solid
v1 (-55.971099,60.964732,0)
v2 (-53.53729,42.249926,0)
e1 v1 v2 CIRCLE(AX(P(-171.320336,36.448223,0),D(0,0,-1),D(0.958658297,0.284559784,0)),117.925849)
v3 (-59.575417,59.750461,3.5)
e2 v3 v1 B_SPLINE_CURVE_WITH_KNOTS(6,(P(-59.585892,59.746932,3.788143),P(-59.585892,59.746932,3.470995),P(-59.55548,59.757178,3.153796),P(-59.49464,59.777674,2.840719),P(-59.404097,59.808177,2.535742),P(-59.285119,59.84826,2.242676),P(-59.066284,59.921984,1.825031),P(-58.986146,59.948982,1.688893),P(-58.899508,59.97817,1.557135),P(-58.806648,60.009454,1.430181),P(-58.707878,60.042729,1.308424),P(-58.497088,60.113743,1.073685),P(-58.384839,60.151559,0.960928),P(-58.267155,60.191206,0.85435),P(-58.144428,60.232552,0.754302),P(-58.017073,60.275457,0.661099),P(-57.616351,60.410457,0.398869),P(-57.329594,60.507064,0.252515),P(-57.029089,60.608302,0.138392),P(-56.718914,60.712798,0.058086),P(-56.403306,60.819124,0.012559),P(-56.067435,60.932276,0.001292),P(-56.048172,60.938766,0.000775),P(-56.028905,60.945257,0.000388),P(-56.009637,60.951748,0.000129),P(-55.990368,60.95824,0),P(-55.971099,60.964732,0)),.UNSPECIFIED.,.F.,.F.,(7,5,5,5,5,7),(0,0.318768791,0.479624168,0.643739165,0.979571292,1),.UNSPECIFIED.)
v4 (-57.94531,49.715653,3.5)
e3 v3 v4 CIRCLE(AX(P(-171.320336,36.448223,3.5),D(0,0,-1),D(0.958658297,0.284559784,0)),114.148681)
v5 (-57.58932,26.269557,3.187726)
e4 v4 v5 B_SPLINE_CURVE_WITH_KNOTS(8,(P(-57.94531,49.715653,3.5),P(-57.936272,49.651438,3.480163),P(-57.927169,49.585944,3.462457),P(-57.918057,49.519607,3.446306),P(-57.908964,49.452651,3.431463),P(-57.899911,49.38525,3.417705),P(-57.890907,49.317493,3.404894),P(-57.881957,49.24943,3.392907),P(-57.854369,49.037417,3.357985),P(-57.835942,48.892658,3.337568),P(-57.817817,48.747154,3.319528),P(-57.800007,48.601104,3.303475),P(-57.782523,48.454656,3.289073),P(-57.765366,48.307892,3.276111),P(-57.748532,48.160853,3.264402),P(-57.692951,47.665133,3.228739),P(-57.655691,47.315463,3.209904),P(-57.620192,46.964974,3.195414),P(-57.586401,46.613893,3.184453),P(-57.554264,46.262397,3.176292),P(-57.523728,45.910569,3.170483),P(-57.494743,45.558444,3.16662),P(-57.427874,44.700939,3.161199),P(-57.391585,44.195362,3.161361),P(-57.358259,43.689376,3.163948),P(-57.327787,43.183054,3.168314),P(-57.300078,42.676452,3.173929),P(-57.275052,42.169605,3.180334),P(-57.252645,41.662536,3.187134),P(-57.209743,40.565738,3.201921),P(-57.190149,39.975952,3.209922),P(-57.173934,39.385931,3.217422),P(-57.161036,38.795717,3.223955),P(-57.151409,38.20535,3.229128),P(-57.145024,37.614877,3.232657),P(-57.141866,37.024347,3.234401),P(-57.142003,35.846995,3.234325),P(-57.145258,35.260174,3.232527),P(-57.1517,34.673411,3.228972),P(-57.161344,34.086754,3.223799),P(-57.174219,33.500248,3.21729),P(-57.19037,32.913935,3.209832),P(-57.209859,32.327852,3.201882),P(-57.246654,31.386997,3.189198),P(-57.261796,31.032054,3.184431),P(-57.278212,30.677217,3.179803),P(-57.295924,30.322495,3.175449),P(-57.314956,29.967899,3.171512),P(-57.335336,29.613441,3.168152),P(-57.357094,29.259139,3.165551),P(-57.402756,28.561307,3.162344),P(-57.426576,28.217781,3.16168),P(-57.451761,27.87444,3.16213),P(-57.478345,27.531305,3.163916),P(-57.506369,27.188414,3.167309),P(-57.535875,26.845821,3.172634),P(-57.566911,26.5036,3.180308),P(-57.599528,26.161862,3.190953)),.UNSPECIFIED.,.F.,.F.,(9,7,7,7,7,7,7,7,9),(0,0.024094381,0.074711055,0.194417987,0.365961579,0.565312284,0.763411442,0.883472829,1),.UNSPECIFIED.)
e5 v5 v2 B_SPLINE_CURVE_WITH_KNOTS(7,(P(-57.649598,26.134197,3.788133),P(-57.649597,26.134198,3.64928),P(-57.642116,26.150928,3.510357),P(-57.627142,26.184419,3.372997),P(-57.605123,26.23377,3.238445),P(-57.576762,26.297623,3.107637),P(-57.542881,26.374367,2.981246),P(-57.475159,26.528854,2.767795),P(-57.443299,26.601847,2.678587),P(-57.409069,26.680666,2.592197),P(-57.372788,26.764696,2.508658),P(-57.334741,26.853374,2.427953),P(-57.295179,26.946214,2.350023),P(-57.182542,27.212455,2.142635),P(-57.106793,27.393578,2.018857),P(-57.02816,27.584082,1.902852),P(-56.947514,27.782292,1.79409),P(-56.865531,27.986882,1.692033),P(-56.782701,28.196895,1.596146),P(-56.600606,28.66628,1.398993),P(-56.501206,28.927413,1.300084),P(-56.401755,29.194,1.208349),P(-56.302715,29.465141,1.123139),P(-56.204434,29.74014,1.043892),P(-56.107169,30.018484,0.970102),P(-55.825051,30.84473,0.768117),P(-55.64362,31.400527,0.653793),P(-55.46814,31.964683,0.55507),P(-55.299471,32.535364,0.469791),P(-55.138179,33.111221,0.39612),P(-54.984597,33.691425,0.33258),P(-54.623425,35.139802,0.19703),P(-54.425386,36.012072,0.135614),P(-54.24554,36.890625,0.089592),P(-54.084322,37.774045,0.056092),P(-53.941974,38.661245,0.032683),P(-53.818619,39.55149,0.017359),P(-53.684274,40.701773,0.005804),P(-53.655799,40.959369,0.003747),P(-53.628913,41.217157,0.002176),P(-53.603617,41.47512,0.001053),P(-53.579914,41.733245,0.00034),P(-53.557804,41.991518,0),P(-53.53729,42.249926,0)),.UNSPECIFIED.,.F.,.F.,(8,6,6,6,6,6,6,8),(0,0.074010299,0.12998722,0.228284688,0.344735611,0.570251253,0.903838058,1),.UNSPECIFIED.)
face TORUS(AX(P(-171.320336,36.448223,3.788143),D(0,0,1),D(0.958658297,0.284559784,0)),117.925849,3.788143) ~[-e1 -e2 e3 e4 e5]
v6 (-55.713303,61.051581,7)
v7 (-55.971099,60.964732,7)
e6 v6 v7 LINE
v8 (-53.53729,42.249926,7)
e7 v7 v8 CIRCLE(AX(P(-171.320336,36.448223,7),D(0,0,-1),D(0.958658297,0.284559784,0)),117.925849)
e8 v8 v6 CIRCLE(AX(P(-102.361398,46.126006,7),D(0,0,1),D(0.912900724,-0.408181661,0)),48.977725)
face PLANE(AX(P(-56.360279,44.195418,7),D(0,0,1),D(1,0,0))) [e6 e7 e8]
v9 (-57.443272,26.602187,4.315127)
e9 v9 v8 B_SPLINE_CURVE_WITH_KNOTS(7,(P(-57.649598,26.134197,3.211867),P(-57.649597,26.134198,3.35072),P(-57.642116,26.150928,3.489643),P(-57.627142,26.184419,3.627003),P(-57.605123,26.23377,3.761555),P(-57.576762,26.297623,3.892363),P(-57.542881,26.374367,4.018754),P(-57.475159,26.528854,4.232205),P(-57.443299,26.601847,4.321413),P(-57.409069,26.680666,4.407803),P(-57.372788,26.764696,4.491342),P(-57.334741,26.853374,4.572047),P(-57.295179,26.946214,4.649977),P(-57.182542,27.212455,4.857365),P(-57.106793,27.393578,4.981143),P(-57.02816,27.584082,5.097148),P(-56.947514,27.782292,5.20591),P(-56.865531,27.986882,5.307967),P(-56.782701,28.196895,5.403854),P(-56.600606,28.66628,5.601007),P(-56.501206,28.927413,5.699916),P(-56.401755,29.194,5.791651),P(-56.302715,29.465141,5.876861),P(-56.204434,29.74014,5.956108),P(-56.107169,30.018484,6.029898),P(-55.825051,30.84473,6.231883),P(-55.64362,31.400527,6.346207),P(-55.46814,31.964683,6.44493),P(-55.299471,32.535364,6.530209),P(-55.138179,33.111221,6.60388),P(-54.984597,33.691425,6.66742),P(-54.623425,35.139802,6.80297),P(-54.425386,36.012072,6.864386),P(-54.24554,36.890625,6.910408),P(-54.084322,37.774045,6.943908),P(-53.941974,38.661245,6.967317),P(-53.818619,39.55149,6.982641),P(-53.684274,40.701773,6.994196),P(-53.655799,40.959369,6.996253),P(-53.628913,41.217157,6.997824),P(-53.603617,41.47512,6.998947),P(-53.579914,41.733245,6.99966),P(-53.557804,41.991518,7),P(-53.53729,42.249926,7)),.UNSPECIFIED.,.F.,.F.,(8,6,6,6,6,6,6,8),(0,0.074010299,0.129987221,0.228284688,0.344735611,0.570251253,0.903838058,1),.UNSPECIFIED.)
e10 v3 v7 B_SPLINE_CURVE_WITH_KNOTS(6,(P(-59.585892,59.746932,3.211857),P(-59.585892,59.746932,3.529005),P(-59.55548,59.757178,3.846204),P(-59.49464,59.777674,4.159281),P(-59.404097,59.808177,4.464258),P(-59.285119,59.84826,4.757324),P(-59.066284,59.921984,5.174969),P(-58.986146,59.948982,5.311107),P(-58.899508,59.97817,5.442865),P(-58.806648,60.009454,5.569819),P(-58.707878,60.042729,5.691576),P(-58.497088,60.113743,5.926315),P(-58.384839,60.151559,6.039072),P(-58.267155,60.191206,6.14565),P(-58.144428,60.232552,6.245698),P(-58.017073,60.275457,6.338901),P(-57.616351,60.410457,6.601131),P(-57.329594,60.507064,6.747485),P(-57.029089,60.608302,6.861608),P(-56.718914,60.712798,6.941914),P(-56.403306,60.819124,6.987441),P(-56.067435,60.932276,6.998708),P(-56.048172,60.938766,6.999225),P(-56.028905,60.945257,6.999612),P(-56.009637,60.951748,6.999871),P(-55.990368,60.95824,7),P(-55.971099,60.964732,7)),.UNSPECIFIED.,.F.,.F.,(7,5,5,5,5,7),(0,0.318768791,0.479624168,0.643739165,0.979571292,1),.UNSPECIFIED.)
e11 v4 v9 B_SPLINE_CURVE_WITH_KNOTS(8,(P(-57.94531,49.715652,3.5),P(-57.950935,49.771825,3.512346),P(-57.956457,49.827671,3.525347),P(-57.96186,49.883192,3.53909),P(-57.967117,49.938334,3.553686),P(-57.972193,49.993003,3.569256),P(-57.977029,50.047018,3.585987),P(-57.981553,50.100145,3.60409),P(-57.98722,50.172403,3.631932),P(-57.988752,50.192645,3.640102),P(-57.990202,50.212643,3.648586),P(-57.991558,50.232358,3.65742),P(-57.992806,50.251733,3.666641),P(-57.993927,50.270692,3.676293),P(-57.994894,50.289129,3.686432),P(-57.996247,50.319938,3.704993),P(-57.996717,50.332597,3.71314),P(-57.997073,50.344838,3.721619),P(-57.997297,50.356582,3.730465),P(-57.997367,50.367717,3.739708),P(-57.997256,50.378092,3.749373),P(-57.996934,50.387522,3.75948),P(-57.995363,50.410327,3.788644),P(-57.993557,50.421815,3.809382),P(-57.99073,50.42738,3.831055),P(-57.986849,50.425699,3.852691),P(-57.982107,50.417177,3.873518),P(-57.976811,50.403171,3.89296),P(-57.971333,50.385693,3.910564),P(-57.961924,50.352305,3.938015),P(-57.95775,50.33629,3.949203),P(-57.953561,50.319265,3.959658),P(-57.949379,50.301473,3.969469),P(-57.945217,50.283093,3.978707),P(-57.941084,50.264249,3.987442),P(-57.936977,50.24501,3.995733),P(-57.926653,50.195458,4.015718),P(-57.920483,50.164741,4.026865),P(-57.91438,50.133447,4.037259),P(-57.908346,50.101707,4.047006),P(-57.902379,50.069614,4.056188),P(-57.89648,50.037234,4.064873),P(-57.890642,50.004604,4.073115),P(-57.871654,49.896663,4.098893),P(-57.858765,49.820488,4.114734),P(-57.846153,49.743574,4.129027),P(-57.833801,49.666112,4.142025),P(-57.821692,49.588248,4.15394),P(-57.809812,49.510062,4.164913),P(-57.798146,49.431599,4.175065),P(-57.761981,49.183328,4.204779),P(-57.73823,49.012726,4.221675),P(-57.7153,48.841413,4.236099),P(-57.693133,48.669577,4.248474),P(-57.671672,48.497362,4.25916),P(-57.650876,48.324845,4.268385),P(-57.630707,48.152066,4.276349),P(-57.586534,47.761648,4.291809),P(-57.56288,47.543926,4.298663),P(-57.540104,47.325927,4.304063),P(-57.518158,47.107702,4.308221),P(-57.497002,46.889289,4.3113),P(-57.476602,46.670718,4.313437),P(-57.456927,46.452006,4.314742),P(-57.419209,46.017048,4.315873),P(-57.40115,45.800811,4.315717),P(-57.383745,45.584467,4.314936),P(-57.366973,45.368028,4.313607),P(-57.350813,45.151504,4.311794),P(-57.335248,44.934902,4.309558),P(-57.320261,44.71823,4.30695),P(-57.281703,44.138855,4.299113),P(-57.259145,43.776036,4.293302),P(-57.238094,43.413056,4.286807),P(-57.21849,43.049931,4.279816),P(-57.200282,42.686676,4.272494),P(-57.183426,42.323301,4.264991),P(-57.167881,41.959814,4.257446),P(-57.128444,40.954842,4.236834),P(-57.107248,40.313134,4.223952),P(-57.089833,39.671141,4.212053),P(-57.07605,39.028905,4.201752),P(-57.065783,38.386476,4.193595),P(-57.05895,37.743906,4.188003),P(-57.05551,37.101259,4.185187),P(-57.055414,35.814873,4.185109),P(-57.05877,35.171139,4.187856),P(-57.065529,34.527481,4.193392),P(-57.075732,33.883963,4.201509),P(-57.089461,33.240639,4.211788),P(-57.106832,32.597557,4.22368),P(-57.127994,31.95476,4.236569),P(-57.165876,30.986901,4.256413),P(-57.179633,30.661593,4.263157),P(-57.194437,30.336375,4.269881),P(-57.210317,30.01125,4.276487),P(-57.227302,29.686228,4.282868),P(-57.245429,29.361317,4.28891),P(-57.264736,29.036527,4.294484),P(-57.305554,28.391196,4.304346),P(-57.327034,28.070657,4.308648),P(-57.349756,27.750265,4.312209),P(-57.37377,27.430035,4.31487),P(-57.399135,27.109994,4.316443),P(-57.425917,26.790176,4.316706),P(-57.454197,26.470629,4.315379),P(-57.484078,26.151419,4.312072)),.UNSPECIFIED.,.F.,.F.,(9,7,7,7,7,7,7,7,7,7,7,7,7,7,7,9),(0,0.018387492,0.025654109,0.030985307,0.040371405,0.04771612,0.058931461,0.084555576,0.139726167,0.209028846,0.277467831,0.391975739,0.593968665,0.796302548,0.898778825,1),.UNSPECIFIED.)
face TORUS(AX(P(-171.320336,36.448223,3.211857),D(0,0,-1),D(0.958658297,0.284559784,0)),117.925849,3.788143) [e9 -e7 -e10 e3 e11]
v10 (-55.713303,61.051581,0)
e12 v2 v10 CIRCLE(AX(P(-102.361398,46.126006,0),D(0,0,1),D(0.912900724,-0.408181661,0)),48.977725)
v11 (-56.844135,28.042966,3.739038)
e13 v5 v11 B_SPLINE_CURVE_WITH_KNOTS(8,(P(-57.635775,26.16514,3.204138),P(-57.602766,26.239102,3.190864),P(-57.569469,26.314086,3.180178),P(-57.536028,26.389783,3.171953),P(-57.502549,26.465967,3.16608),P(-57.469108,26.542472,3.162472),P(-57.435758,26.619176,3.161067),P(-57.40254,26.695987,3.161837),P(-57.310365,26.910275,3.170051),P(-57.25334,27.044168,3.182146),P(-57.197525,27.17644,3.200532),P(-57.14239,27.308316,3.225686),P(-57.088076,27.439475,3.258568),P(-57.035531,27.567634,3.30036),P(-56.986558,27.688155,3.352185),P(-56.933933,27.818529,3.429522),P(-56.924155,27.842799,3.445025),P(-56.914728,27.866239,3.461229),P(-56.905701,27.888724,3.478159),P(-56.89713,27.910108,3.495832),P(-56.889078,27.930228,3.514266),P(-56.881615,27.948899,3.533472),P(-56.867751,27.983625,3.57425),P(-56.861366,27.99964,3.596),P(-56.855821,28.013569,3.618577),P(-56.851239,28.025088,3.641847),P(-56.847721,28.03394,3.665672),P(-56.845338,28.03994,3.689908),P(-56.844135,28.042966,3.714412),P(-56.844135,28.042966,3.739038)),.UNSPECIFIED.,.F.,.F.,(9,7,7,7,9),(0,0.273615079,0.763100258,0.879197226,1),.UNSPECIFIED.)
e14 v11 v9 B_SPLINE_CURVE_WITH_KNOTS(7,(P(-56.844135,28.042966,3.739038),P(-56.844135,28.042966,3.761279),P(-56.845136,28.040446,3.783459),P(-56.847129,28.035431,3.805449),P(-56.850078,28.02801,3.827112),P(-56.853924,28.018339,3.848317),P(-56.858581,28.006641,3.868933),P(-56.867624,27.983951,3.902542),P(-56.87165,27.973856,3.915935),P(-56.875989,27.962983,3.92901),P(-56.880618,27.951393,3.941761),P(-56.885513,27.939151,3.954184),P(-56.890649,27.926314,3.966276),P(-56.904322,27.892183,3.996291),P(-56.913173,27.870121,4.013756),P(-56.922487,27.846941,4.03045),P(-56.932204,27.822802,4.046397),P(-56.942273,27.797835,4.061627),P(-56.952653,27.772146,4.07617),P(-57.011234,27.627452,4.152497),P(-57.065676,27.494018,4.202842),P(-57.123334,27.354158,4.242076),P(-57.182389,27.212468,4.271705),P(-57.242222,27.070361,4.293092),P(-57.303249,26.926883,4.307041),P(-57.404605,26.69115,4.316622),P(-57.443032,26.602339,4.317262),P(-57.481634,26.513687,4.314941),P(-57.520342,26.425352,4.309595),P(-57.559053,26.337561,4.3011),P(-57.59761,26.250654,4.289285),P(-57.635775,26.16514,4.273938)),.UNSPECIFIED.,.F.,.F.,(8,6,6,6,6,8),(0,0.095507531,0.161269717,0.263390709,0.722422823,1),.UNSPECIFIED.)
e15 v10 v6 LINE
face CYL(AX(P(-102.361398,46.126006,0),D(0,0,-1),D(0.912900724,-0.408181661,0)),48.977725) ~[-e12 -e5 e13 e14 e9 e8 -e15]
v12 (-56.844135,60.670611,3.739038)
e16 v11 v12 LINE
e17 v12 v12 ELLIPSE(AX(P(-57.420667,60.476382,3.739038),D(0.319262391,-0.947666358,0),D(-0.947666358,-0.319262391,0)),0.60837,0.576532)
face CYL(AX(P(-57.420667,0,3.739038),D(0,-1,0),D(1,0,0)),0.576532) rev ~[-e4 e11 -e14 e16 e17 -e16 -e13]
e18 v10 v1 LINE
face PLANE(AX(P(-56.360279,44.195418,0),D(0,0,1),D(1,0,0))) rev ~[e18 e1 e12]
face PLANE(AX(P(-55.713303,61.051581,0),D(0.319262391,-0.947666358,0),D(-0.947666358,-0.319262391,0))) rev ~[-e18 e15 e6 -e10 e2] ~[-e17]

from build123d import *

# Parameters (mm, degrees)
F1_DEPTH    = 7
F2_T2_ANGLE = 26.471202853
F2_T4_ANGLE = 26.471202853
F3_R        = 0.5765318272
F4_DEPTH    = 81.70182


# Not quite as in the source:
# - a fillet or chamfer that OpenCascade refuses, or shapes differently, is made with other operations: its cross-section is extruded or revolved along the edge and cut away or added


with BuildPart() as f1:
    # F0 (on Top) → F1 (new body)
    with BuildSketch(Plane.XY):
        with BuildLine():
            Line((-55.7133033872, 61.0515810549), (-59.585891664, 59.7469322383))
            ThreePointArc((-59.585891664, 59.7469322383), (-57.3715400132, 43.0123532737), (-57.6495975256, 26.1341966689))
            ThreePointArc((-57.6495975256, 26.1341966689), (-53.4588056212, 43.414181653), (-55.7133033872, 61.0515810549))
        make_face()
    extrude(amount=F1_DEPTH)

    # F2: fillet of radius 3.7881425007 on 2 edges, made by hand

    # F2_s1 → F2_t2 (revolve, cut)
    with BuildSketch(Plane(origin=(-23.8154539079, 80.2322879023, 0), x_dir=(0, 0, 1), z_dir=(-0.2845597835, 0.9586582966, 0))):
        with BuildLine():
            ThreePointArc((3.2118574993, -39.7282571763), (5.8904787496, -38.6187359259), (7, -35.9401146756))
            Line((7, -35.9401146756), (7, -39.7282571763))
            Line((7, -39.7282571763), (3.2118574993, -39.7282571763))
        make_face()
    revolve(axis=Axis((-171.3203362847, 36.4482226677, 7), (0, 0, -1)), revolution_arc=F2_T2_ANGLE, mode=Mode.SUBTRACT)

    # F2_s3 → F2_t4 (revolve, cut)
    with BuildSketch(Plane(origin=(-23.8154539079, 80.2322879023, 0), x_dir=(0, 0, 1), z_dir=(-0.2845597835, 0.9586582966, 0))):
        with BuildLine():
            ThreePointArc((3.7881425007, -39.7282571763), (1.1095212504, -38.6187359259), (0, -35.9401146756))
            Line((0, -35.9401146756), (0, -39.7282571763))
            Line((0, -39.7282571763), (3.7881425007, -39.7282571763))
        make_face()
    revolve(axis=Axis((-171.3203362847, 36.4482226677, 0), (0, 0, -1)), revolution_arc=F2_T4_ANGLE, mode=Mode.SUBTRACT)

    # F3 (on Front) → F4 (cut)
    with BuildSketch(Plane.XZ):
        with Locations((-57.4206672609, 3.7390380166)):
            Circle(F3_R)
    extrude(amount=-F4_DEPTH, mode=Mode.SUBTRACT)


solid = f1.part
